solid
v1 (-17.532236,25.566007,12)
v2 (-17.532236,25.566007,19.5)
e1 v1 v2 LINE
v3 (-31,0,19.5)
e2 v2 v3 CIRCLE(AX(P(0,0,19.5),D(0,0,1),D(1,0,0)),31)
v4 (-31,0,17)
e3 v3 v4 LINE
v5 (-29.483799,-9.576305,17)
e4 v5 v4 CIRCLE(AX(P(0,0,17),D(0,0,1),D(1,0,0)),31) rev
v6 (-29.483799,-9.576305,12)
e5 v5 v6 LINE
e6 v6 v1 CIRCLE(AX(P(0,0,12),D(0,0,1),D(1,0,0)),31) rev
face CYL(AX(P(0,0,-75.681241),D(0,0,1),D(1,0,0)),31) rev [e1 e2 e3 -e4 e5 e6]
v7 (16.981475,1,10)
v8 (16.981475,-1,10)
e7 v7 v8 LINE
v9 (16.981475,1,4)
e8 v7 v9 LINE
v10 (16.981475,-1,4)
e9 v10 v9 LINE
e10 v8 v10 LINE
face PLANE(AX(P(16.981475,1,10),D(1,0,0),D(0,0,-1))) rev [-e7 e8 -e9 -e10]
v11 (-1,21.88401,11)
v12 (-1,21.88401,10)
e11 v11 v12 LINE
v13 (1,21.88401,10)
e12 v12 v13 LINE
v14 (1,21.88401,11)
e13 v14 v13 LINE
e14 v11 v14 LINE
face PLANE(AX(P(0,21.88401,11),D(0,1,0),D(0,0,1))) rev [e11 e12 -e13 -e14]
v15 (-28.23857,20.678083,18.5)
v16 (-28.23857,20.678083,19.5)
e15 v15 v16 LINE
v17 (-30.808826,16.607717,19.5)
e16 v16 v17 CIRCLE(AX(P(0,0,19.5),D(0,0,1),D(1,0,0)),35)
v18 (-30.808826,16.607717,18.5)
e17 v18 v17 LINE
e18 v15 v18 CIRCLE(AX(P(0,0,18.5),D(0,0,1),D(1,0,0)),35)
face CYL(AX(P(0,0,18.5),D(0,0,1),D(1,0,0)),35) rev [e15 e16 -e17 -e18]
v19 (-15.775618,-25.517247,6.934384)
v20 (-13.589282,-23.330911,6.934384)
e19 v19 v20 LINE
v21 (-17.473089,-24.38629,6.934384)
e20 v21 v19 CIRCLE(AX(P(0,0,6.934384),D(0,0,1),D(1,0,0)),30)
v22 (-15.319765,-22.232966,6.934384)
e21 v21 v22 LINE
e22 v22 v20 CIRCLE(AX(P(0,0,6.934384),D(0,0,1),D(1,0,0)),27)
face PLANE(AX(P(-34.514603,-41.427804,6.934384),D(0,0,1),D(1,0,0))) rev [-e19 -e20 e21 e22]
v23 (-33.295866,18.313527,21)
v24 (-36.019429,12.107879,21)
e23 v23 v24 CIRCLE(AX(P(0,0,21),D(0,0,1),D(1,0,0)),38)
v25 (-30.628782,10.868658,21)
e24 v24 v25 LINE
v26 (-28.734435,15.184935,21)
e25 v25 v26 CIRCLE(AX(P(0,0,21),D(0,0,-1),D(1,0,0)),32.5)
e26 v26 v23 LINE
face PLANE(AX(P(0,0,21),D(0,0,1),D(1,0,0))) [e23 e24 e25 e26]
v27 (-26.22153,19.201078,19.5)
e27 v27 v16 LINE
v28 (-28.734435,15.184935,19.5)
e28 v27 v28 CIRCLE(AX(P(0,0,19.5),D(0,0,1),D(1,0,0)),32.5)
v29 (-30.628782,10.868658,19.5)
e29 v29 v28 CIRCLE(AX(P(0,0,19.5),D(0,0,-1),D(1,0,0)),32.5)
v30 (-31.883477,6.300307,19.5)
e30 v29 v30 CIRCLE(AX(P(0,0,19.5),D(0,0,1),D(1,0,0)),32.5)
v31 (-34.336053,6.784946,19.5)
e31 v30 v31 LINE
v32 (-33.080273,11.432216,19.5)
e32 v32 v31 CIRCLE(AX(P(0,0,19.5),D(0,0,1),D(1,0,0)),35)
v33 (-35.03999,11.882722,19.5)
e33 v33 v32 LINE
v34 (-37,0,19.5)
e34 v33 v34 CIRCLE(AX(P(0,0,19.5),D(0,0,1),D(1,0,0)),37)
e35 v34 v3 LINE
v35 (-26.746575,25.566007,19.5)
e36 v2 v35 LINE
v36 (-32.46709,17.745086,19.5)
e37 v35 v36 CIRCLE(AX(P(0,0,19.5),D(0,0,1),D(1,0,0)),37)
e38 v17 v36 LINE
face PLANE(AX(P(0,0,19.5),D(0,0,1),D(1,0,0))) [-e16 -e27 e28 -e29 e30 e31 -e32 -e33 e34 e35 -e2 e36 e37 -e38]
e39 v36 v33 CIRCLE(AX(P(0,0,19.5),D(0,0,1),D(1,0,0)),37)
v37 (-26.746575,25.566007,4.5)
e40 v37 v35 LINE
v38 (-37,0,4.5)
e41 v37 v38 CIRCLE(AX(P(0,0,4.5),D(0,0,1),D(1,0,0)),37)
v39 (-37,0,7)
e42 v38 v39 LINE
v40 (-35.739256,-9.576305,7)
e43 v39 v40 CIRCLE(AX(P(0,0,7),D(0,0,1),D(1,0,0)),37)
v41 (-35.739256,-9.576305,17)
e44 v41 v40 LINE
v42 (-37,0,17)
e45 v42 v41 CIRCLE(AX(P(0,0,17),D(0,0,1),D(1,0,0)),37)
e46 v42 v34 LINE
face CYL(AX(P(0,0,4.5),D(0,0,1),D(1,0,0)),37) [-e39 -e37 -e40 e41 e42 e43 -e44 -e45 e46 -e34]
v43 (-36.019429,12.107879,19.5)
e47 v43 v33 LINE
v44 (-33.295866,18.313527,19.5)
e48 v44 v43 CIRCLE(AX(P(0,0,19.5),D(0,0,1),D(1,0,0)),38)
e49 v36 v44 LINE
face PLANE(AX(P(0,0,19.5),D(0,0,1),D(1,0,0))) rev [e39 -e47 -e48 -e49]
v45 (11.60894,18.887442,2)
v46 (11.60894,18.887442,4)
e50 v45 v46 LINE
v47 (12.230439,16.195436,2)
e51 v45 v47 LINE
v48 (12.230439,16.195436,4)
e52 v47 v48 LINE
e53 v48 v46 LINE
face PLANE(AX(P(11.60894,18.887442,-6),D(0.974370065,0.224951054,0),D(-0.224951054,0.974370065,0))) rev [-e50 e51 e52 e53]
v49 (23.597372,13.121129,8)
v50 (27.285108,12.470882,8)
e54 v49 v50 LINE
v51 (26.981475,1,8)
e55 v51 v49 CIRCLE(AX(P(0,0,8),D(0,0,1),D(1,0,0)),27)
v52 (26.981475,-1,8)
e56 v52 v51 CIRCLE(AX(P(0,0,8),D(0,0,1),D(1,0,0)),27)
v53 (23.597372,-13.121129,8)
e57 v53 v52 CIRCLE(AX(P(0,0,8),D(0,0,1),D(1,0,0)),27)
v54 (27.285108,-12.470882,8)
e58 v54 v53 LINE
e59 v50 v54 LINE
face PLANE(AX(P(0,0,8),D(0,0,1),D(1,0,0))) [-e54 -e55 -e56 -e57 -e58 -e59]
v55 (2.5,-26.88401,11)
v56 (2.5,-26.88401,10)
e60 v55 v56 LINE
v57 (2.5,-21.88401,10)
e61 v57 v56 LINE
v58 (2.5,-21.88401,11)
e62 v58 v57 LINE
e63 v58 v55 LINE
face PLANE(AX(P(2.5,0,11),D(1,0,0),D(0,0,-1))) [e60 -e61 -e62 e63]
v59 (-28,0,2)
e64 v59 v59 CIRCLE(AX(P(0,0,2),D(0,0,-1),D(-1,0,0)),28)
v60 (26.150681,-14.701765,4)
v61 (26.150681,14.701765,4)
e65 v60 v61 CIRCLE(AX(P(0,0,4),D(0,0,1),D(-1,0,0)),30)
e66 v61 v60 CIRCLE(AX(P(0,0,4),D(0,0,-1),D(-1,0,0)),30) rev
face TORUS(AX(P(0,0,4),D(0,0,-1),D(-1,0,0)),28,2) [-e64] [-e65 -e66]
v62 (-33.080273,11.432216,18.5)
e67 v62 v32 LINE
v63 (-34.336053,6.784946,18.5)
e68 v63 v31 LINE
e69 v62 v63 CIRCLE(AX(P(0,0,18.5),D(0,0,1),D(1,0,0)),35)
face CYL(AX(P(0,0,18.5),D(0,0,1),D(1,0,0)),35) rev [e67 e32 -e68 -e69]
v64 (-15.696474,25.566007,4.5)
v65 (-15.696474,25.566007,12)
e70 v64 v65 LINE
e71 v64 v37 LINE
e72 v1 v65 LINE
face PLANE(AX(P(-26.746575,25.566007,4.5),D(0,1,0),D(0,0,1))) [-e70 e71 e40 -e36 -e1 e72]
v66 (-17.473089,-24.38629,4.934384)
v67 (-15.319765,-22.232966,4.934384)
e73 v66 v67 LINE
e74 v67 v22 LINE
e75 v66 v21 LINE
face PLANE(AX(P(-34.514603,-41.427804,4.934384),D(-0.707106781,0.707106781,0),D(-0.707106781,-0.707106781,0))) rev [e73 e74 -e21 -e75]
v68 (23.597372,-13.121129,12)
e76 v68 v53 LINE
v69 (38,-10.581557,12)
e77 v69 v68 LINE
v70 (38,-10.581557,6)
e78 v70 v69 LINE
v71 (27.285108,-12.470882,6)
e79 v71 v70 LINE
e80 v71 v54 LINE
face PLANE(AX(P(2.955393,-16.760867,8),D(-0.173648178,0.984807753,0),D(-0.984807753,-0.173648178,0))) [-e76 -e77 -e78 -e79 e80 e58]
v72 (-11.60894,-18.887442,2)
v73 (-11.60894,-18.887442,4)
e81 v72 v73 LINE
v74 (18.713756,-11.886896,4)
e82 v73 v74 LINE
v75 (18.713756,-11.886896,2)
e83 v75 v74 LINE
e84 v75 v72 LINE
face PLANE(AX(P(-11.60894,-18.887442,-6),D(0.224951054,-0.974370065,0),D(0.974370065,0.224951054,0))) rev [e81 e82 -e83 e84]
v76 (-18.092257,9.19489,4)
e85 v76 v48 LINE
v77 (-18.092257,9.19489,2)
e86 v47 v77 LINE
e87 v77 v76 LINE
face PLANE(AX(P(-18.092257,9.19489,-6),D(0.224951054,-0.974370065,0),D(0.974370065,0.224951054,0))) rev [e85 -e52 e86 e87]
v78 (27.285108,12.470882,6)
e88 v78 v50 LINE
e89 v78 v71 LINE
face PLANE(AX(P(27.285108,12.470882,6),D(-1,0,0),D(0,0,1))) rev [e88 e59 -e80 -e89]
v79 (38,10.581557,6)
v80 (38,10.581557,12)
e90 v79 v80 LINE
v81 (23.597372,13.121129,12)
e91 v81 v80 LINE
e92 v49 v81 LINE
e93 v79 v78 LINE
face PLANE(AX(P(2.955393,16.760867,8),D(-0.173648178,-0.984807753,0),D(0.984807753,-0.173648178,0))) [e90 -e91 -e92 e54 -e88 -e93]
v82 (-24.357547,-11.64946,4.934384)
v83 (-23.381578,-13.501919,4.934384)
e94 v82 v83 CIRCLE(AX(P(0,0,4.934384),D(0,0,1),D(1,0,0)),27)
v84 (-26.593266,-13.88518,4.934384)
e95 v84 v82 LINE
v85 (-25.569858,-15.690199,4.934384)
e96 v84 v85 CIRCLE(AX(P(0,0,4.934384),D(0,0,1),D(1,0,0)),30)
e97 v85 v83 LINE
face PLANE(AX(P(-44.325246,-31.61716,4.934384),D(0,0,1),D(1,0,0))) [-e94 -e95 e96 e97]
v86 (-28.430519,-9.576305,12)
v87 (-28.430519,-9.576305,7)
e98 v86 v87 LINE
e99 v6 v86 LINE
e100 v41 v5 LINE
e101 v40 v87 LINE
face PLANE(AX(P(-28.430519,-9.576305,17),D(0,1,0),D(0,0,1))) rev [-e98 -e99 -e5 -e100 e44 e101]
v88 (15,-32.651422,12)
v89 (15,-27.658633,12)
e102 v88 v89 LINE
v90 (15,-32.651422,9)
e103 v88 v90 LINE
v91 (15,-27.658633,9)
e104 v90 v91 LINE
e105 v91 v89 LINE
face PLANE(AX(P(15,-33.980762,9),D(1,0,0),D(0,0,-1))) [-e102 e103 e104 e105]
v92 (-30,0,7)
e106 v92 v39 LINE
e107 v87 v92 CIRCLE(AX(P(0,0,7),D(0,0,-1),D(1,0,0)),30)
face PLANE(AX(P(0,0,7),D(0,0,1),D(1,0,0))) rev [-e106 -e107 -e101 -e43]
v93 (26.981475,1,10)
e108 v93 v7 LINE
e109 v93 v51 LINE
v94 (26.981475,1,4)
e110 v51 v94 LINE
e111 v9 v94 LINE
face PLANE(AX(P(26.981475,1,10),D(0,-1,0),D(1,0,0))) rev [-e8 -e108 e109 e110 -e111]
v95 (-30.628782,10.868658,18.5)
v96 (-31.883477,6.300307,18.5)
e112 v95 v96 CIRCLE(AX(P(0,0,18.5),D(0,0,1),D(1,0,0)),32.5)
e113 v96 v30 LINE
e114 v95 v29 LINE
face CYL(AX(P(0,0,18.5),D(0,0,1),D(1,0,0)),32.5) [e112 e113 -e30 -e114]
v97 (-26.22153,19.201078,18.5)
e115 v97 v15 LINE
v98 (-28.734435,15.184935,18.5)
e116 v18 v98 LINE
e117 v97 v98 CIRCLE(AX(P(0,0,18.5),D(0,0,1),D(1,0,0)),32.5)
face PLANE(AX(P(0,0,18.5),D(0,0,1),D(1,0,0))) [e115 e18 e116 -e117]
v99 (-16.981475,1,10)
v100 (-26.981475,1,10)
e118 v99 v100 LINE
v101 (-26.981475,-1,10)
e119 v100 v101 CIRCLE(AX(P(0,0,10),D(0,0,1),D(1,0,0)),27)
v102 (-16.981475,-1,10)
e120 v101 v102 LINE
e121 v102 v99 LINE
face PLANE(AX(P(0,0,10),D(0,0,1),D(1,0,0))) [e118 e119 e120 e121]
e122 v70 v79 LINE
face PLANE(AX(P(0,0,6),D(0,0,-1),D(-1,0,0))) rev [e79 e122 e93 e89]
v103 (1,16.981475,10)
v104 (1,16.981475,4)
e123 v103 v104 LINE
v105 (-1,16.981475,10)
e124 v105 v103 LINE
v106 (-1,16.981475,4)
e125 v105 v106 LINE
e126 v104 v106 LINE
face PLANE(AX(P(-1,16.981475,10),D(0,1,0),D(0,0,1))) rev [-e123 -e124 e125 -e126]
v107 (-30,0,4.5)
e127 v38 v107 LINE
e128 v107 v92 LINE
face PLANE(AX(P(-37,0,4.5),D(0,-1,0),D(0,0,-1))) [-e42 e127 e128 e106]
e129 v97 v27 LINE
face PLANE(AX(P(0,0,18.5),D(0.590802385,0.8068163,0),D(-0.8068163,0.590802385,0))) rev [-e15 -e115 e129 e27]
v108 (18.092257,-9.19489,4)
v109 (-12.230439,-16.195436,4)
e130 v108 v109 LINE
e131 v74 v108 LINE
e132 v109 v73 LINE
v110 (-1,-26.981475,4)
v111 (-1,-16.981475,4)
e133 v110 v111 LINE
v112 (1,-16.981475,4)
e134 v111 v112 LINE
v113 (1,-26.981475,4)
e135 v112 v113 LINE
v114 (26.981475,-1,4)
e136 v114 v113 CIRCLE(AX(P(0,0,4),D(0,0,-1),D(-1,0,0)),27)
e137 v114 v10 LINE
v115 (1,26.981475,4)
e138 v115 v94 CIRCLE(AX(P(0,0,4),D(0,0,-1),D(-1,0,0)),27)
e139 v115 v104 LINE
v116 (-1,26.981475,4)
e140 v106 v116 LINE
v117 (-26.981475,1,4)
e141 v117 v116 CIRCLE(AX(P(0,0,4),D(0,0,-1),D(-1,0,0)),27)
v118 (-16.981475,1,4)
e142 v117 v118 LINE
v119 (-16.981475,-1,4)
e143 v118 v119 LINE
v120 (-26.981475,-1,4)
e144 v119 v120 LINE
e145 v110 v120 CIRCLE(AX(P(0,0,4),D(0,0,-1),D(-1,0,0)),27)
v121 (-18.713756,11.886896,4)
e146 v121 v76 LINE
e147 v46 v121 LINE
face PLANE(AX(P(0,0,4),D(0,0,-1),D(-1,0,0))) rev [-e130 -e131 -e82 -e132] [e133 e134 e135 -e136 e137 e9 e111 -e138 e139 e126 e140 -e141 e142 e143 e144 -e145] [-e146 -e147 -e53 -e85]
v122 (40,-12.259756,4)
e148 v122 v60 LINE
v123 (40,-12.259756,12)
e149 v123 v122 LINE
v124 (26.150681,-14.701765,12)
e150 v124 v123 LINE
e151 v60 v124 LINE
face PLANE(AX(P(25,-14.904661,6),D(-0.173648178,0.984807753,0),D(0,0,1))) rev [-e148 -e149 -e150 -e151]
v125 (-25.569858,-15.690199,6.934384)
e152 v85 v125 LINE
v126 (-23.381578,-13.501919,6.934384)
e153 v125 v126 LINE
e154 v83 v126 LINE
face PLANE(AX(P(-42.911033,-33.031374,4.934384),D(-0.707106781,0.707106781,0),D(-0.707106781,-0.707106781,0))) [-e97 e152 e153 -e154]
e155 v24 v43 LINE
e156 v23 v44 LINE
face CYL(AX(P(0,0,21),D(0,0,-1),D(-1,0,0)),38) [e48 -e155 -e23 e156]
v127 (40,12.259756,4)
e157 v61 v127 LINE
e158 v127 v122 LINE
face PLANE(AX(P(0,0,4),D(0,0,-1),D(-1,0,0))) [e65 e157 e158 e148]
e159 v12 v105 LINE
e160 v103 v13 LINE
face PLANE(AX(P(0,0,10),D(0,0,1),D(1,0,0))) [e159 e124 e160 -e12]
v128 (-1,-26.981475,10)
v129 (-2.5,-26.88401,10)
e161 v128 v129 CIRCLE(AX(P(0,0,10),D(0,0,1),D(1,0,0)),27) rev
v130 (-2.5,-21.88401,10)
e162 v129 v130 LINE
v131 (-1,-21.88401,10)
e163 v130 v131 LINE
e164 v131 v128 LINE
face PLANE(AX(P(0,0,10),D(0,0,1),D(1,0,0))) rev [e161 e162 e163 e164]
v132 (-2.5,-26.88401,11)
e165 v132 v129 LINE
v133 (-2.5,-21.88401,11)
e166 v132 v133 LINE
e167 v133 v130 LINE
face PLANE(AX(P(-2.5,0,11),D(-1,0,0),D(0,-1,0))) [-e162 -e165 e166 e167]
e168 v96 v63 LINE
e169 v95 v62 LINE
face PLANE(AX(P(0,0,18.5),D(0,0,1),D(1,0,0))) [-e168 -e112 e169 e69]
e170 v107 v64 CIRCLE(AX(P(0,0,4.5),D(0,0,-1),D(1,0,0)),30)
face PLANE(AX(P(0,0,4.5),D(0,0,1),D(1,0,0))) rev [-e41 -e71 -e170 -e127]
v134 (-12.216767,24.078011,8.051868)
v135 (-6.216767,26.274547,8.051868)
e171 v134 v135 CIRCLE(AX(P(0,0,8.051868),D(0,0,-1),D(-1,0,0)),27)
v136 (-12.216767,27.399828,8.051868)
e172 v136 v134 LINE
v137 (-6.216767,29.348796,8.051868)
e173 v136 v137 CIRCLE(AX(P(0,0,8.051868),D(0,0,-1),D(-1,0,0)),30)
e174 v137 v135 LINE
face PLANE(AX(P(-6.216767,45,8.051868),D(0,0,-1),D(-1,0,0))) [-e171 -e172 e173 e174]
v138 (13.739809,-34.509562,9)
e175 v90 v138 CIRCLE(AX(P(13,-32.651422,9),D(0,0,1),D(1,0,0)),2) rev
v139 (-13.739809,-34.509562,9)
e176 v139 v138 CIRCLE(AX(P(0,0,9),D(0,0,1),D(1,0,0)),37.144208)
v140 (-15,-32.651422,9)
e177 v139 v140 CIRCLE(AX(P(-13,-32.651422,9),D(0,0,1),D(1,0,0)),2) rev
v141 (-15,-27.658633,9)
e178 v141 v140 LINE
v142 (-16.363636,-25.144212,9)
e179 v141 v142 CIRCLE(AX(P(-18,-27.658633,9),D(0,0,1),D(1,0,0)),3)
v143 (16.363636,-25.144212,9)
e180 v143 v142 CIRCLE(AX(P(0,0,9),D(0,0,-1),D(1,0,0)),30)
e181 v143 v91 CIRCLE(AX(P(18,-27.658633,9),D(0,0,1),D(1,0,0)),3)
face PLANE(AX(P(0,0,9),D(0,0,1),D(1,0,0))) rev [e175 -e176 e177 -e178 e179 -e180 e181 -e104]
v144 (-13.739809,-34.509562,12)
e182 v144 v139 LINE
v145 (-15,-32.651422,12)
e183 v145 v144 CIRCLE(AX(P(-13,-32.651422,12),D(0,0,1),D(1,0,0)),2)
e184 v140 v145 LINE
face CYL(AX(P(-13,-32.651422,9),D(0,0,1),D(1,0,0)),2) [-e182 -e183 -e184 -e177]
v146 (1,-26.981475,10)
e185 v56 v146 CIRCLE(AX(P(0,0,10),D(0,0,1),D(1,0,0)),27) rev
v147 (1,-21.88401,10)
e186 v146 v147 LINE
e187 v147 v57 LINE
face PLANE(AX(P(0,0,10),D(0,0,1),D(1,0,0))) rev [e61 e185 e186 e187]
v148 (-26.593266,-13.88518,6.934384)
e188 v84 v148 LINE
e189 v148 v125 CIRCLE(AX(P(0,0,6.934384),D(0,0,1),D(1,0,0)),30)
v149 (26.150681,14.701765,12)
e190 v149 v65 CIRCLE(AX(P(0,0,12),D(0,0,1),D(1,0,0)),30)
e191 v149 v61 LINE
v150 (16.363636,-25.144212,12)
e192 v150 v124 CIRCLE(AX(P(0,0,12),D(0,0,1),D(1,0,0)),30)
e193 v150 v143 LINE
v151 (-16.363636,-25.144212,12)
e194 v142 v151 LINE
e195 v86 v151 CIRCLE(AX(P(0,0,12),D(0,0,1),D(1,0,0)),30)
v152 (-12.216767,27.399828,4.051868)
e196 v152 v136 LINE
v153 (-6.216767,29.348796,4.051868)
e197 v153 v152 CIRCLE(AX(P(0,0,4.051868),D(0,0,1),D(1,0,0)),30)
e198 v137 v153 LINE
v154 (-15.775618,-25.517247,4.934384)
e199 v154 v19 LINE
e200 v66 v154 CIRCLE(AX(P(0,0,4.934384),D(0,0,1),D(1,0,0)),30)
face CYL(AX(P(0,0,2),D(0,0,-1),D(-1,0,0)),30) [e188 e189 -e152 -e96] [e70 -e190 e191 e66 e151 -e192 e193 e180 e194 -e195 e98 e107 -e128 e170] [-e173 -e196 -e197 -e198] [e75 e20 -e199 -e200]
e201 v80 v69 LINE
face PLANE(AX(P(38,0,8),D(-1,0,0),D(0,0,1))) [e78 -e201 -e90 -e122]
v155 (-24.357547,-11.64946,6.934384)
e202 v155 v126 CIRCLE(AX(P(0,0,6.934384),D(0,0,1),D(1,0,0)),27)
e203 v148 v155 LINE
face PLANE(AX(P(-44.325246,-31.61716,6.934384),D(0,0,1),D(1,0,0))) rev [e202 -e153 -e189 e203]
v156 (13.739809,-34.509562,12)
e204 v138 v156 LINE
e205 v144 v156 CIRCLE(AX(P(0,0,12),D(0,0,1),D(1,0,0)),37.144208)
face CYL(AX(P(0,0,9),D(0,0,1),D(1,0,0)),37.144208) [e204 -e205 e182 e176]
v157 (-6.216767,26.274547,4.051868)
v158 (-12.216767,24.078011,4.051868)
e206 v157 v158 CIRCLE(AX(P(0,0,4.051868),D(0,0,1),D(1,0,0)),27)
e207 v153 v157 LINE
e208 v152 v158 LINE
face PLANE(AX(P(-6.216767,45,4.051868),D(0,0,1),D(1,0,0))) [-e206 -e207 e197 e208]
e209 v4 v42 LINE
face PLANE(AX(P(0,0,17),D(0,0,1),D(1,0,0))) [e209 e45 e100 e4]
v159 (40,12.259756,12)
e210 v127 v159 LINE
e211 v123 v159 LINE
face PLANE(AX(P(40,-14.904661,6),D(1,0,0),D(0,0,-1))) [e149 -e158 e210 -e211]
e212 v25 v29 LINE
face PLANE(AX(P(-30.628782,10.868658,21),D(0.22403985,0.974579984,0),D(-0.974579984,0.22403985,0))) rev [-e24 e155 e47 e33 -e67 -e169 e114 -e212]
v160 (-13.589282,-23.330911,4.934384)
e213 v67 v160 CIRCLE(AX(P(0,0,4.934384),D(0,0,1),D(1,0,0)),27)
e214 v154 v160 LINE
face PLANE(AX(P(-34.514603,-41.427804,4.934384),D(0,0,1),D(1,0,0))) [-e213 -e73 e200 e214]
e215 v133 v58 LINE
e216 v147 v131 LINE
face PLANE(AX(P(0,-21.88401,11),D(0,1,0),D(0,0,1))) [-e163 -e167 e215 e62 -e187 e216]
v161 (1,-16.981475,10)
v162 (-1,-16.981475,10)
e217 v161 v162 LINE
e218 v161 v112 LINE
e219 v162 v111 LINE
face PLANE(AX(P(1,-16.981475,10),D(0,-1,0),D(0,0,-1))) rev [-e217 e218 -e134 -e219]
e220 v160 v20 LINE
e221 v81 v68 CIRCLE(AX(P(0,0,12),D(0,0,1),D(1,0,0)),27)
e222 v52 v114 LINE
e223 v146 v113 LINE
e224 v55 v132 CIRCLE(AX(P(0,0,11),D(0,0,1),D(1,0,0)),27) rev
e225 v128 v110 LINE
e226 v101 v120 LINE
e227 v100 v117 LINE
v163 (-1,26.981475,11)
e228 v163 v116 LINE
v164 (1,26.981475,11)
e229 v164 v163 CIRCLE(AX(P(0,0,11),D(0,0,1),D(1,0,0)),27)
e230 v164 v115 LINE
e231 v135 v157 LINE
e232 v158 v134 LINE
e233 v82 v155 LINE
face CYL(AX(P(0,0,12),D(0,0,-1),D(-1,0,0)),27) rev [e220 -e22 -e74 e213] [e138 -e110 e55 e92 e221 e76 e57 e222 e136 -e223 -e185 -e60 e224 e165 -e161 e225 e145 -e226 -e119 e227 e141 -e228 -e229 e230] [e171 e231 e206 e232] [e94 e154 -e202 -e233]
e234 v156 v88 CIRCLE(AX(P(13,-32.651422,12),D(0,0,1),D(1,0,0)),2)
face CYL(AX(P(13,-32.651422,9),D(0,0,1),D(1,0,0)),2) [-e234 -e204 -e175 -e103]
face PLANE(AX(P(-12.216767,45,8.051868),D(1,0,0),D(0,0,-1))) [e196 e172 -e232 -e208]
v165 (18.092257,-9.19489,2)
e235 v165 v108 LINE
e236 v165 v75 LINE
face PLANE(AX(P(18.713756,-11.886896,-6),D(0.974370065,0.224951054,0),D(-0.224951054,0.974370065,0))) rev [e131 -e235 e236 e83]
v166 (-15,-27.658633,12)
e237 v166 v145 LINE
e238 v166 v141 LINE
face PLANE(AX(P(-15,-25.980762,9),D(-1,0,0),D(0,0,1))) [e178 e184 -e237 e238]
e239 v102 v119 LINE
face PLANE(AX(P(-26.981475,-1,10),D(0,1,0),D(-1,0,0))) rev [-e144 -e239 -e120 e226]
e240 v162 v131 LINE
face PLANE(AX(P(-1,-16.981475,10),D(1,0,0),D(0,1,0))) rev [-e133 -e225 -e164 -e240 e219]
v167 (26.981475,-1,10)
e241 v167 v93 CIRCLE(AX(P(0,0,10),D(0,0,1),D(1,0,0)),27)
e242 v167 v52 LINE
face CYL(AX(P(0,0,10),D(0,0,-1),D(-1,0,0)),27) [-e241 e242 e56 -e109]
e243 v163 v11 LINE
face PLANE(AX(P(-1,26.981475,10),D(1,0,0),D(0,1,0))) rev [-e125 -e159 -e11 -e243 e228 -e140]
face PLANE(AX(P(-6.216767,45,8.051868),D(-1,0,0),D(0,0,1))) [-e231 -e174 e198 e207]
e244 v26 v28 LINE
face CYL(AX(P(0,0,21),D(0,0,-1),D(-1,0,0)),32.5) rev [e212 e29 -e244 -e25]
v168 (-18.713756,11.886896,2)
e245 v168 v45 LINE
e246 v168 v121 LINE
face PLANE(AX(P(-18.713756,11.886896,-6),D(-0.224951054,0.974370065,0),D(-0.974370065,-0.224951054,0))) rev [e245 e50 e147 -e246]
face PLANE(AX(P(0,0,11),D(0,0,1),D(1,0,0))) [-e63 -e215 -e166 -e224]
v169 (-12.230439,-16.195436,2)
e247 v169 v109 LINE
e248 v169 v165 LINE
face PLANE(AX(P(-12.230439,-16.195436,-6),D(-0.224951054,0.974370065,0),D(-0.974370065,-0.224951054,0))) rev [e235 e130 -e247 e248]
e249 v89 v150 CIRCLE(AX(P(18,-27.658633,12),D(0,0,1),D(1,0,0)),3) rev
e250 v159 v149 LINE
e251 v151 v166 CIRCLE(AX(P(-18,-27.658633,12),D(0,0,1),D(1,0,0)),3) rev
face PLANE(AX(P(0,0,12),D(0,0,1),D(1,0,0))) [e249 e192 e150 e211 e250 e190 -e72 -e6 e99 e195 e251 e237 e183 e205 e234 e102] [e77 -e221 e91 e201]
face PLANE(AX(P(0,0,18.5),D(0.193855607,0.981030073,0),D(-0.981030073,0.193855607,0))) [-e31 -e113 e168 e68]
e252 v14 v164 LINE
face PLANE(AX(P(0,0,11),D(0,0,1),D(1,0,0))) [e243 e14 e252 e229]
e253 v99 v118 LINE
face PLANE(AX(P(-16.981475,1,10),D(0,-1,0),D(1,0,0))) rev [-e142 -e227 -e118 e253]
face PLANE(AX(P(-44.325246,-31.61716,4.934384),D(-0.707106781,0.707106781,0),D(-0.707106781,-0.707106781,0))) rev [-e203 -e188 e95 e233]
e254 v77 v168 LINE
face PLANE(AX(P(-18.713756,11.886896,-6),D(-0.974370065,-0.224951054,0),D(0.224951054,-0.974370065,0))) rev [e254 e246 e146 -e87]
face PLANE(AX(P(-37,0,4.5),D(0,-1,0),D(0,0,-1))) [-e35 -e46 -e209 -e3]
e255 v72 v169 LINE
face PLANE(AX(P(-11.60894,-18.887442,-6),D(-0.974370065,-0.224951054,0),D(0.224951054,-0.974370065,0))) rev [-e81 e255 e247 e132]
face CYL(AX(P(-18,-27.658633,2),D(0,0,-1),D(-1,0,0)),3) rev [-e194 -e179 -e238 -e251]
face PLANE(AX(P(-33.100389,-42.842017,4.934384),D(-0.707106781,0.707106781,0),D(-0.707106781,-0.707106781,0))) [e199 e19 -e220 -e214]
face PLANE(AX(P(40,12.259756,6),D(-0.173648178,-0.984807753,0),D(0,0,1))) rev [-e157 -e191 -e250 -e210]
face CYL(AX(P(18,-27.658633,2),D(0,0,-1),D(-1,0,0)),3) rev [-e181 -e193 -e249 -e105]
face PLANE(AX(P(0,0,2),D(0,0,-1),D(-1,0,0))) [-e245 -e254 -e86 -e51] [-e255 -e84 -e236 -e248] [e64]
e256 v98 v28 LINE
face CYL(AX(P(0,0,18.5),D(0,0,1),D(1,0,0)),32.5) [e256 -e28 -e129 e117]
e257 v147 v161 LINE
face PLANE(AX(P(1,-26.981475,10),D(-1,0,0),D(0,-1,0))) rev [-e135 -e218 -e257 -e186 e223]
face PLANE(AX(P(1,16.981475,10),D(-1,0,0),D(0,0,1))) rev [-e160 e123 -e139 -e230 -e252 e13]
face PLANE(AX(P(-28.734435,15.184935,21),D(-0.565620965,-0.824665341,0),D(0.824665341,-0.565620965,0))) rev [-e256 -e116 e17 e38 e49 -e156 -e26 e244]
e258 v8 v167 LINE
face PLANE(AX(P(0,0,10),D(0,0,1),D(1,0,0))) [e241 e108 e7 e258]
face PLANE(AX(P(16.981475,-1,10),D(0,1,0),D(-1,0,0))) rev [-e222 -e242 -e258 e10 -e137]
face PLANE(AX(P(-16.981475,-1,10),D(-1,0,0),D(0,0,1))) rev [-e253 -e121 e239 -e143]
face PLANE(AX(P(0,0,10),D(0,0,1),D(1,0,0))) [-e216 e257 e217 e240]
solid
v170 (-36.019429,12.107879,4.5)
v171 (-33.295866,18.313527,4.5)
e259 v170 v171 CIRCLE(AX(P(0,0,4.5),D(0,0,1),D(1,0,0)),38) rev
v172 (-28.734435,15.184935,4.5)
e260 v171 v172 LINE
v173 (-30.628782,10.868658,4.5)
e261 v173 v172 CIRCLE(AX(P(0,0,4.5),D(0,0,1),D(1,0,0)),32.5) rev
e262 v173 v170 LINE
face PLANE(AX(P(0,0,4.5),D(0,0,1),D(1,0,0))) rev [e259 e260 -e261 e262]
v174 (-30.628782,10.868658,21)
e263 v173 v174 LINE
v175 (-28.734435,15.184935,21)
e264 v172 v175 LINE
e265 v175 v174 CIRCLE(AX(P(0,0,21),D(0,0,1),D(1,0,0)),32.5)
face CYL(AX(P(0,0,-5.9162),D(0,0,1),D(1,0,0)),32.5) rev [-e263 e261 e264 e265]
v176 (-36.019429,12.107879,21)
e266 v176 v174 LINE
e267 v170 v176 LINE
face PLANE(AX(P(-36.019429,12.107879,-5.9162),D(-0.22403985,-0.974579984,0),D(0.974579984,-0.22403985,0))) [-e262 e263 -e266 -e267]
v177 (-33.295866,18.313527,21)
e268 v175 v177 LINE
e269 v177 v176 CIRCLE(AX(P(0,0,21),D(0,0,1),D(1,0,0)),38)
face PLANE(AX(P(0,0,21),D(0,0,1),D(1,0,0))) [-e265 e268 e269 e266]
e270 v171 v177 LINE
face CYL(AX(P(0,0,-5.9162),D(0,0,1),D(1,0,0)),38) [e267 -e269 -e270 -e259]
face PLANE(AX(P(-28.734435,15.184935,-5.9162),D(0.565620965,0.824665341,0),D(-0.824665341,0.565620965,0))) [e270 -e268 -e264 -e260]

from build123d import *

# Parameters (mm, degrees)
SKETCH_1_R           = 30
EXTRUDE_1_DEPTH      = 2
SKETCH_5_R           = 30
SKETCH_5_R_2         = 27
EXTRUDE_2_DEPTH      = 10
EXTRUDE_START        = -3
EXTRUDE_3_DEPTH      = 3
FILLET_2_R           = 3
FILLET_3_R           = 3
EXTRUDE_START_2      = -6
EXTRUDE_4_DEPTH      = 6
EXTRUDE_6_DEPTH      = 7.5
SKETCH_14_R          = 31
CUT_EXTRUDE_3_DEPTH  = 7.5
CHAMFER_4_SIZE       = 2.644904711
CHAMFER_4_SIZE_2     = 15
CHAMFER_5_SIZE       = 2.644904711
CHAMFER_5_SIZE_2     = 15
CUT_EXTRUDE_START    = -4
CUT_EXTRUDE_6_DEPTH  = 4
EXTRUDE_10_DEPTH     = 5
CUT_EXTRUDE_START_2  = 6
CUT_EXTRUDE_7_DEPTH  = 6
EXTRUDE_11_DEPTH     = 8
EXTRUDE_12_DEPTH     = 1
EXTRUDE_13_DEPTH     = 1.5
EXTRUDE_14_DEPTH     = 16.5
CUT_EXTRUDE_START_3  = -1
CUT_EXTRUDE_8_DEPTH  = 1
EXTRUDE_START_3      = 2
EXTRUDE_15_DEPTH     = 2
CUT_EXTRUDE_9_DEPTH  = 2
SKETCH_33_R          = 30
CUT_EXTRUDE_10_DEPTH = 2
SKETCH_34_R          = 30
EXTRUDE_16_DEPTH     = 2
FILLET_4_R           = 2
FILLET_5_R           = 2
CUT_EXTRUDE_11_DEPTH = 10
FILLET_6_R           = 2
SKETCH_37_W          = 2
SKETCH_37_H          = 2
CUT_EXTRUDE_12_DEPTH = 65
SKETCH_38_W          = 6
SKETCH_38_H          = 4
CUT_EXTRUDE_14_DEPTH = 45


# Some blends are built 0.0001 mm under size
with BuildPart() as part:
    # 草图1 → 凸台-拉伸1 (new body)
    with BuildSketch(Plane.XY):
        Circle(SKETCH_1_R)
    extrude(amount=EXTRUDE_1_DEPTH)

    # 草图5 → 凸台-拉伸2 (add)
    with BuildSketch(Plane.XY.offset(2)):
        Circle(SKETCH_5_R)
        Circle(SKETCH_5_R_2, mode=Mode.SUBTRACT)
    extrude(amount=EXTRUDE_2_DEPTH)

    # 草图6 → 凸台-拉伸3 (add)
    with BuildSketch(Plane.XY.offset(12).offset(EXTRUDE_START)):
        with BuildLine():
            Line((-15, -25.980762114), (-15, -33.980762114))
            ThreePointArc((-15, -33.980762114), (0, -37.144208079), (15, -33.980762114))
            Line((15, -33.980762114), (15, -25.980762114))
            ThreePointArc((15, -25.980762114), (0, -30), (-15, -25.980762114))
        make_face()
    extrude(amount=EXTRUDE_3_DEPTH)

    # 圆角2
    fillet_2_edges = [part.edges().sort_by_distance(p)[0] for p in [
        (-15, -25.980762114, 10.5),
    ]]
    fillet(fillet_2_edges, radius=FILLET_2_R)

    # 圆角3
    fillet_3_edges = [part.edges().sort_by_distance(p)[0] for p in [
        (15, -25.980762114, 10.5),
    ]]
    fillet(fillet_3_edges, radius=FILLET_3_R)

    # 草图8 → 凸台-拉伸4 (add)
    with BuildSketch(Plane.XY.offset(12).offset(EXTRUDE_START_2)):
        with BuildLine():
            Line((26.035573303, -14.90466111), (40, -14.90466111))
            Line((40, -14.90466111), (40, 14.90466111))
            Line((40, 14.90466111), (26.035573303, 14.90466111))
            ThreePointArc((26.035573303, 14.90466111), (30, 0), (26.035573303, -14.90466111))
        make_face()
    extrude(amount=EXTRUDE_4_DEPTH)

    # 草图13 → 凸台-拉伸6 (add, symmetric)
    with BuildSketch(Plane.XY.offset(12)):
        with BuildLine():
            Line((-26.746575291, 25.566006927), (-15.696473801, 25.566006927))
            ThreePointArc((-15.696473801, 25.566006927), (-26.181044804, 14.647624141), (-30, 0))
            Line((-30, 0), (-37, 0))
            ThreePointArc((-37, 0), (-34.341107188, 13.772739637), (-26.746575291, 25.566006927))
        make_face()
    extrude(amount=EXTRUDE_6_DEPTH, both=True)

    # 草图14 → 切除-拉伸3 (cut)
    with BuildSketch(Plane.XY.offset(19.5)):
        Circle(SKETCH_14_R)
    extrude(amount=-CUT_EXTRUDE_3_DEPTH, mode=Mode.SUBTRACT)

    # 倒角4
    # the kernel refuses this chamfer: 15, 2.644904711 mm, written as the material it takes off along each edge
    with BuildSketch(Plane(origin=(40, 14.90466111, -32.978081946), x_dir=(0.21013876076743002, -0.9776715712462589, 0), z_dir=(0, 0, 1))) as chamfer_4_piece_1_section:
        Polygon((CHAMFER_4_SIZE * 0.977671571108, -CHAMFER_4_SIZE * 0.210138760738), (-CHAMFER_4_SIZE_2 * 0.210138760767, -CHAMFER_4_SIZE_2 * 0.977671571246), (0, 0), align=None)
    chamfer_4_piece_1 = extrude(amount=83.956163893, mode=Mode.PRIVATE)
    chamfer_4_piece_1 = chamfer_4_piece_1 - Plane(origin=(0, 0, 9), x_dir=(1, 0, 0), z_dir=(0, 0, -1)) * Cylinder(30, 227, mode=Mode.PRIVATE)
    add(chamfer_4_piece_1, mode=Mode.SUBTRACT)

    # 倒角5
    # the kernel refuses this chamfer: 15, 2.644904711 mm, written as the material it takes off along each edge
    with BuildSketch(Plane(origin=(40, -14.90466111, -32.978081946), x_dir=(0.21013876076743002, 0.9776715712462589, 0), z_dir=(0, 0, 1))) as chamfer_5_piece_1_section:
        Polygon((CHAMFER_5_SIZE * 0.977671571108, CHAMFER_5_SIZE * 0.210138760738), (-CHAMFER_5_SIZE_2 * 0.210138760767, CHAMFER_5_SIZE_2 * 0.977671571246), (0, 0), align=None)
    chamfer_5_piece_1 = extrude(amount=83.956163893, mode=Mode.PRIVATE)
    chamfer_5_piece_1 = chamfer_5_piece_1 - Plane(origin=(0, 0, 9), x_dir=(1, 0, 0), z_dir=(0, 0, -1)) * Cylinder(30, 227, mode=Mode.PRIVATE)
    add(chamfer_5_piece_1, mode=Mode.SUBTRACT)

    # 草图16 → 切除-拉伸6 (cut)
    with BuildSketch(Plane.XY.offset(12).offset(CUT_EXTRUDE_START)):
        with BuildLine():
            ThreePointArc((27, 0), (26.135503138, 6.77757152), (23.59737217, 13.121129016))
            Line((23.59737217, 13.121129016), (18.746765164, 13.976421904))
            Line((18.746765164, 13.976421904), (22.28876202, -13.351872293))
            Line((22.28876202, -13.351872293), (23.59737217, -13.121129016))
            ThreePointArc((23.59737217, -13.121129016), (26.135503138, -6.77757152), (27, 0))
        make_face()
        with BuildLine():
            Line((18.746765164, 13.976421904), (23.59737217, 13.121129016))
            ThreePointArc((23.59737217, 13.121129016), (-27, 0), (23.59737217, -13.121129016))
            Line((23.59737217, -13.121129016), (22.28876202, -13.351872293))
            Line((22.28876202, -13.351872293), (18.746765164, 13.976421904))
        make_face()
        with BuildLine():
            Line((38, 10.581557137), (28.290235639, 12.29365057))
            Line((28.290235639, 12.29365057), (23.59737217, 13.121129016))
            ThreePointArc((23.59737217, 13.121129016), (26.135503138, 6.77757152), (27, 0))
            ThreePointArc((27, 0), (26.135503138, -6.77757152), (23.59737217, -13.121129016))
            Line((23.59737217, -13.121129016), (38, -10.581557137))
            Line((38, -10.581557137), (38, 10.581557137))
        make_face()
    extrude(amount=CUT_EXTRUDE_6_DEPTH, mode=Mode.SUBTRACT)

    # 草图17 → 凸台-拉伸10 (add, symmetric)
    with BuildSketch(Plane.XY.offset(12)):
        with BuildLine():
            Line((-28.430518618, -9.576304669), (-35.739255573, -9.576304669))
            ThreePointArc((-35.739255573, -9.576304669), (-36.683459871, -4.829469112), (-37, 0))
            Line((-37, 0), (-31, 0))
            Line((-31, 0), (-30, 0))
            ThreePointArc((-30, 0), (-29.605029628, -4.852032639), (-28.430518618, -9.576304669))
        make_face()
    extrude(amount=EXTRUDE_10_DEPTH, both=True)

    # 草图18 → 切除-拉伸7 (cut)
    with BuildSketch(Plane.XY.offset(12).offset(CUT_EXTRUDE_START_2)):
        with BuildLine():
            ThreePointArc((-31, 0), (-30.618603506, -4.847795306), (-29.483798753, -9.576304669))
            Line((-29.483798753, -9.576304669), (-28.430518618, -9.576304669))
            ThreePointArc((-28.430518618, -9.576304669), (-29.605029628, -4.852032639), (-30, 0))
            Line((-30, 0), (-31, 0))
        make_face()
    extrude(amount=-CUT_EXTRUDE_7_DEPTH, mode=Mode.SUBTRACT)

    # 草图19 → 凸台-拉伸11 (add)
    with BuildSketch(Plane.XY.offset(2)):
        with BuildLine():
            Line((-1, 26.981475126), (-1, 16.981475126))
            Line((-1, 16.981475126), (1, 16.981475126))
            Line((1, 16.981475126), (1, 26.981475126))
            ThreePointArc((1, 26.981475126), (0, 27), (-1, 26.981475126))
        make_face()
        with BuildLine():
            Line((26.981475126, 1), (16.981475126, 1))
            Line((16.981475126, 1), (16.981475126, -1))
            Line((16.981475126, -1), (26.981475126, -1))
            ThreePointArc((26.981475126, -1), (27, 0), (26.981475126, 1))
        make_face()
        with BuildLine():
            Line((1, -26.981475126), (1, -16.981475126))
            Line((1, -16.981475126), (-1, -16.981475126))
            Line((-1, -16.981475126), (-1, -26.981475126))
            ThreePointArc((-1, -26.981475126), (0, -27), (1, -26.981475126))
        make_face()
        with BuildLine():
            Line((-26.981475126, -1), (-16.981475126, -1))
            Line((-16.981475126, -1), (-16.981475126, 1))
            Line((-16.981475126, 1), (-26.981475126, 1))
            ThreePointArc((-26.981475126, 1), (-27, 0), (-26.981475126, -1))
        make_face()
    extrude(amount=EXTRUDE_11_DEPTH)

    # 草图20 → 凸台-拉伸12 (add)
    with BuildSketch(Plane.XY.offset(10)):
        with BuildLine():
            ThreePointArc((2.5, -26.884010118), (0, -27), (-2.5, -26.884010118))
            Line((-2.5, -26.884010118), (-2.5, -21.884010118))
            Line((-2.5, -21.884010118), (2.5, -21.884010118))
            Line((2.5, -21.884010118), (2.5, -26.884010118))
        make_face()
        with BuildLine():
            ThreePointArc((1, 26.981475126), (0, 27), (-1, 26.981475126))
            Line((-1, 26.981475126), (-1, 21.884010118))
            Line((-1, 21.884010118), (1, 21.884010118))
            Line((1, 21.884010118), (1, 26.981475126))
        make_face()
    extrude(amount=EXTRUDE_12_DEPTH)

    # 草图21 → 凸台-拉伸13 (add)
    with BuildSketch(Plane.XY.offset(19.5)):
        with BuildLine():
            Line((-28.734434843, 15.184935109), (-33.295866493, 18.31352709))
            ThreePointArc((-33.295866493, 18.31352709), (-34.796265088, 15.271540063), (-36.019428995, 12.10787904))
            Line((-36.019428995, 12.10787904), (-30.628781703, 10.868658214))
            ThreePointArc((-30.628781703, 10.868658214), (-29.759963562, 13.061185581), (-28.734434843, 15.184935109))
        make_face()
    extrude(amount=EXTRUDE_13_DEPTH)

    # 草图28 → 切除-拉伸8 (cut)
    with BuildSketch(Plane.XY.offset(19.5).offset(CUT_EXTRUDE_START_3)):
        with BuildLine():
            Line((-34.336052546, 6.784946244), (-31.883477364, 6.300307226))
            ThreePointArc((-31.883477364, 6.300307226), (-31.339481347, 8.60737526), (-30.628781703, 10.868658214))
            Line((-30.628781703, 10.868658214), (-33.080272788, 11.432215546))
            ThreePointArc((-33.080272788, 11.432215546), (-33.788156333, 9.130196691), (-34.336052546, 6.784946244))
        make_face()
        with BuildLine():
            ThreePointArc((-28.734434843, 15.184935109), (-27.551258788, 17.238855508), (-26.22152974, 19.201077524))
            Line((-26.22152974, 19.201077524), (-28.23857049, 20.678083487))
            ThreePointArc((-28.23857049, 20.678083487), (-29.593761465, 18.687142166), (-30.80882562, 16.607717))
            Line((-30.80882562, 16.607717), (-28.734434843, 15.184935109))
        make_face()
    extrude(amount=CUT_EXTRUDE_8_DEPTH, mode=Mode.SUBTRACT)

    # 草图31 → 凸台-拉伸15 (add)
    with BuildSketch(Plane(origin=(0, 0, 6), x_dir=(-1, 0, 0), z_dir=(0, 0, -1)).offset(EXTRUDE_START_3)):
        with BuildLine():
            Line((-40, 12.259756399), (-40, -12.259756399))
            Line((-40, -12.259756399), (-26.150680767, -14.701765044))
            ThreePointArc((-26.150680767, -14.701765044), (-30, 0), (-26.150680767, 14.701765044))
            Line((-26.150680767, 14.701765044), (-40, 12.259756399))
        make_face()
    extrude(amount=-EXTRUDE_15_DEPTH)

    # 草图32 → 切除-拉伸9 (cut)
    with BuildSketch(Plane.XY.offset(8)):
        Polygon((38, -10.581557137), (27.285107826, -12.470881722), (27.285107826, 12.470881722), (38, 10.581557137), align=None)
    extrude(amount=-CUT_EXTRUDE_9_DEPTH, mode=Mode.SUBTRACT)

    # 草图33 → 切除-拉伸10 (cut)
    with BuildSketch(Plane(origin=(0, 0, 0), x_dir=(-1, 0, 0), z_dir=(0, 0, -1))):
        Circle(SKETCH_33_R)
    extrude(amount=-CUT_EXTRUDE_10_DEPTH, mode=Mode.SUBTRACT)

    # 草图34 → 凸台-拉伸16 (add)
    with BuildSketch(Plane(origin=(0, 0, 2), x_dir=(-1, 0, 0), z_dir=(0, 0, -1))):
        Circle(SKETCH_34_R)
    extrude(amount=-EXTRUDE_16_DEPTH)

    # 圆角4
    fillet_4_edges = [part.edges().sort_by_distance(p)[0] for p in [
        (-15, -33.980762114, 10.5),
    ]]
    fillet(fillet_4_edges, radius=FILLET_4_R)

    # 圆角5
    fillet_5_edges = [part.edges().sort_by_distance(p)[0] for p in [
        (15, -33.980762114, 10.5),
    ]]
    fillet(fillet_5_edges, radius=FILLET_5_R)

    # 草图35 → 切除-拉伸11 (cut)
    with BuildSketch(Plane.XY.offset(4)):
        Polygon((-18.713756069, 11.886896156), (11.608940239, 18.887442203), (12.230438934, 16.195435598), (-18.092257374, 9.194889552), align=None)
        Polygon((-12.230438934, -16.195435598), (18.092257374, -9.194889552), (18.713756069, -11.886896156), (-11.608940239, -18.887442203), align=None)
    extrude(amount=-CUT_EXTRUDE_11_DEPTH, mode=Mode.SUBTRACT)

    # 圆角6
    fillet_6_edges = [part.edges().sort_by_distance(p)[0] for p in [
        (-30, 0, 2),
    ]]
    fillet(fillet_6_edges, radius=FILLET_6_R - 0.0001)  # a hair under: the kernel refuses the full size

    # 草图37 → 切除-拉伸12 (cut)
    with BuildSketch(Plane(origin=(7.990737563, 7.990737563, 0), x_dir=(0, 0, 1), z_dir=(-0.7071067811865475, -0.7071067811865476, 0))):
        with Locations((5.93438389, 7.985973932)):
            Rectangle(SKETCH_37_W, SKETCH_37_H)
        with Locations((5.93438389, -5.888371601)):
            Rectangle(SKETCH_37_W, SKETCH_37_H)
    extrude(amount=CUT_EXTRUDE_12_DEPTH, mode=Mode.SUBTRACT)

    # 草图38 → 切除-拉伸14 (cut)
    with BuildSketch(Plane(origin=(0, 0, 0), x_dir=(1, 0, 0), z_dir=(0, 1, 0))):
        with Locations((-9.216767384, -6.051868465)):
            Rectangle(SKETCH_38_W, SKETCH_38_H)
    extrude(amount=CUT_EXTRUDE_14_DEPTH, mode=Mode.SUBTRACT)


with BuildPart() as body_2:
    # 草图26 → 凸台-拉伸14 (new body)
    with BuildSketch(Plane.XY.offset(21)):
        with BuildLine():
            Line((-28.734434843, 15.184935109), (-33.295866493, 18.31352709))
            ThreePointArc((-33.295866493, 18.31352709), (-34.796265088, 15.271540063), (-36.019428995, 12.10787904))
            Line((-36.019428995, 12.10787904), (-30.628781703, 10.868658214))
            ThreePointArc((-30.628781703, 10.868658214), (-29.759963562, 13.061185581), (-28.734434843, 15.184935109))
        make_face()
    extrude(amount=-EXTRUDE_14_DEPTH)


solid = Compound([part.part, body_2.part])
